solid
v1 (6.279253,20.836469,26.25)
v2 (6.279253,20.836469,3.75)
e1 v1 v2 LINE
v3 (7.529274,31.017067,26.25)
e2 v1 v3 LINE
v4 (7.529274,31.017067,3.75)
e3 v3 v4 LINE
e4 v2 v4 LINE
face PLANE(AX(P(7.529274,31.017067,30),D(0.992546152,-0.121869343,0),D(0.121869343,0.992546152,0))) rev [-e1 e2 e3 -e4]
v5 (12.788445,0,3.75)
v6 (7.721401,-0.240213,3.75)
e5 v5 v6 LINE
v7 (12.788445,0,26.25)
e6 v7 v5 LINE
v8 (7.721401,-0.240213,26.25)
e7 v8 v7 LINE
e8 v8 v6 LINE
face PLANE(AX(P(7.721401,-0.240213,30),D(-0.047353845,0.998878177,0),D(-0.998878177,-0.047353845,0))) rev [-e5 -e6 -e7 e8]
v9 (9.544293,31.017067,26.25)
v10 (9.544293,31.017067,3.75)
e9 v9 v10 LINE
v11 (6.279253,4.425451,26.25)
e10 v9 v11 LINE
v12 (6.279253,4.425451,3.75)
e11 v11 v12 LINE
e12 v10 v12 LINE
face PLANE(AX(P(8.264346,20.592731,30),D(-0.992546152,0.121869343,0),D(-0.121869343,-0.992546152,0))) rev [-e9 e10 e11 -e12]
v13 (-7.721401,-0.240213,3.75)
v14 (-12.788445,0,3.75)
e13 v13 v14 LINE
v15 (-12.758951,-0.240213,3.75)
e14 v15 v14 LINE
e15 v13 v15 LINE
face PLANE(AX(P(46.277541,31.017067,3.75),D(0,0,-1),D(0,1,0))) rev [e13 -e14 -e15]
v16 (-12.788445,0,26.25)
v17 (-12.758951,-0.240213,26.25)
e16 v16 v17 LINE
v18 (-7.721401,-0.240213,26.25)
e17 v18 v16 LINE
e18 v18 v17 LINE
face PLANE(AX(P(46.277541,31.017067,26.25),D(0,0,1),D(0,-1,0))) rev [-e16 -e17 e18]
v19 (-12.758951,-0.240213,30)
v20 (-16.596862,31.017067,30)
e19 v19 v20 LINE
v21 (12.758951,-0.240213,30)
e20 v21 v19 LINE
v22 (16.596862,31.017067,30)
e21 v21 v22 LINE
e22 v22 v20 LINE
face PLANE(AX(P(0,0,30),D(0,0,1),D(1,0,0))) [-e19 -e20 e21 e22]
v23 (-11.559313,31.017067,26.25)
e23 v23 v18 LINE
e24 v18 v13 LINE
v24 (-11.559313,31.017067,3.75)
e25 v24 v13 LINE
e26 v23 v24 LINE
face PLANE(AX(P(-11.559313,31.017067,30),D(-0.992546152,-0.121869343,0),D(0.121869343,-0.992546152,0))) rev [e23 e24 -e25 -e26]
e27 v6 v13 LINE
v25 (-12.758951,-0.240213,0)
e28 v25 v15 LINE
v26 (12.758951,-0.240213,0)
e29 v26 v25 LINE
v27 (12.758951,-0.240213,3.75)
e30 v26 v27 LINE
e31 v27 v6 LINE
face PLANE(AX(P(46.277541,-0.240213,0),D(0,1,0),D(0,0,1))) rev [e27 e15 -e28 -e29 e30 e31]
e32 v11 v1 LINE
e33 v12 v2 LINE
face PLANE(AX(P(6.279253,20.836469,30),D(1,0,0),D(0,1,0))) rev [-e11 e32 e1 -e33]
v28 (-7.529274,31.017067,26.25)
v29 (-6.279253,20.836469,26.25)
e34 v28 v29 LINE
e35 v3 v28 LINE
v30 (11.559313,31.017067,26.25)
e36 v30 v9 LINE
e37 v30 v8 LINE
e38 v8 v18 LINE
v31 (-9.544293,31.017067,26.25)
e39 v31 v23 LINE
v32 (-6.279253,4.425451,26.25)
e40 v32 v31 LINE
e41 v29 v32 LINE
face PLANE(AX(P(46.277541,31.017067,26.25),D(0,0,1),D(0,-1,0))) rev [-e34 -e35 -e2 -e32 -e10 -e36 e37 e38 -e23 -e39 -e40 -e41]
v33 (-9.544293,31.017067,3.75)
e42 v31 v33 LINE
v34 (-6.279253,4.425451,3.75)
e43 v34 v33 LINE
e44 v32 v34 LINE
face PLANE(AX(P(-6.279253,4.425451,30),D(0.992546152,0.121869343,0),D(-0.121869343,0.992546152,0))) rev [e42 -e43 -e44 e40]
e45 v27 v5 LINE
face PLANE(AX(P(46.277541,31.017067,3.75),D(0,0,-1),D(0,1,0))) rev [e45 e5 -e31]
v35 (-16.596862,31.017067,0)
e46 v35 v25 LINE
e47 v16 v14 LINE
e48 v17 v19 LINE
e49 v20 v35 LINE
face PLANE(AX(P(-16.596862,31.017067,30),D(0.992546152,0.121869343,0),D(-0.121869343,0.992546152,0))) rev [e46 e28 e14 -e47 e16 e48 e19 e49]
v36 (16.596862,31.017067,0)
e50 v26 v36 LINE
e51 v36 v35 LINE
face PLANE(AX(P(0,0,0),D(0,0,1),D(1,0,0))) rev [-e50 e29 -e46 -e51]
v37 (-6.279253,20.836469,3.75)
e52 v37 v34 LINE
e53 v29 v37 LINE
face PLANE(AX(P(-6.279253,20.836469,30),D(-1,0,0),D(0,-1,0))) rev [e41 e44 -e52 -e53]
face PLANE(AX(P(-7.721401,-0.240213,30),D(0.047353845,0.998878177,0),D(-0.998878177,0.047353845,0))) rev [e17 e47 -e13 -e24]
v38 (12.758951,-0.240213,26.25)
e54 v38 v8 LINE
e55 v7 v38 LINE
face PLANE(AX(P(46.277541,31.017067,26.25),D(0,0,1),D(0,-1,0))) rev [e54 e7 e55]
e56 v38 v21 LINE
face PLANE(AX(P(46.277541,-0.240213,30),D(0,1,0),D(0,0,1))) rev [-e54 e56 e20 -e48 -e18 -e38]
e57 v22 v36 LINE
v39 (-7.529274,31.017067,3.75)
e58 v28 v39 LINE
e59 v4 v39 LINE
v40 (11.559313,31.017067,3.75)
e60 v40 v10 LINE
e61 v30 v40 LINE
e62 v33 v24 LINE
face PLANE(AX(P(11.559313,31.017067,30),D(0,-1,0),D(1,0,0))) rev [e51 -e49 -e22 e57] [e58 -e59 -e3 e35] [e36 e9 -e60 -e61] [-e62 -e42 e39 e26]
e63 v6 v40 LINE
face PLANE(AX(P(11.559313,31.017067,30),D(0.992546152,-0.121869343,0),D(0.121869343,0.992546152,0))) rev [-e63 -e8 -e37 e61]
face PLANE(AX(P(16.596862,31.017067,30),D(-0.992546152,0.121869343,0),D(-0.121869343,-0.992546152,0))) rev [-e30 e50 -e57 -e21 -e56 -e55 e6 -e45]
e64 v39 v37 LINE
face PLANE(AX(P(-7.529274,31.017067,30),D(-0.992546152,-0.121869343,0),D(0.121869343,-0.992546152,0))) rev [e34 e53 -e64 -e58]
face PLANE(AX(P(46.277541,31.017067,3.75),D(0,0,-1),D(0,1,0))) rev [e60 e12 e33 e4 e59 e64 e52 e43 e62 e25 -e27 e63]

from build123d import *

# Parameters (mm, degrees)
SALIENTE_EXTRUIR1_DEPTH             = 30
SALIENTE_EXTRUIR1_2_DEPTH           = 30
SALIENTE_EXTRUIR1_3_DEPTH           = 30
SALIENTE_EXTRUIR1_4_DEPTH           = 30
SALIENTE_EXTRUIR3_REACH             = 48.233
CROQUIS3_W                          = 3.75
CROQUIS3_H                          = 31.257280714
SALIENTE_EXTRUIR3_DIRECTION_2_REACH = 48.233


with BuildPart() as part:
    # Croquis1 → Saliente-Extruir1 (new body)
    with BuildSketch(Plane.XY):
        Polygon((11.559312896, 31.017067239), (16.596862024, 31.017067239), (12.788445042, 0), (7.721401409, -0.240213475), align=None)
    extrude(amount=SALIENTE_EXTRUIR1_DEPTH)



with BuildPart() as body_2:
    # Croquis1 → Saliente-Extruir1 2 (new body)
    with BuildSketch(Plane.XY):
        Polygon((-7.529273594, 31.017067239), (-6.279253351, 20.836469336), (-6.279253351, 4.425451239), (-8.264345654, 20.592730649), (-9.544293245, 31.017067239), align=None)
    extrude(amount=SALIENTE_EXTRUIR1_2_DEPTH)


with BuildPart() as body_3:
    # Croquis1 → Saliente-Extruir1 3 (new body)
    with BuildSketch(Plane.XY):
        Polygon((-11.559312896, 31.017067239), (-7.721401409, -0.240213475), (-12.788445042, 0), (-16.596862024, 31.017067239), align=None)
    extrude(amount=SALIENTE_EXTRUIR1_3_DEPTH)


with BuildPart() as body_4:
    # Croquis1 → Saliente-Extruir1 4 (new body)
    with BuildSketch(Plane.XY):
        Polygon((7.529273594, 31.017067239), (6.279253351, 20.836469336), (6.279253351, 4.425451239), (8.264345654, 20.592730649), (9.544293245, 31.017067239), align=None)
    extrude(amount=SALIENTE_EXTRUIR1_4_DEPTH)


with BuildPart() as part_1:
    add(part.part)

    add(body_2.part)  # Saliente-Extruir3 merges body 2

    add(body_4.part)  # Saliente-Extruir3 merges body 4

    add(body_3.part)  # Saliente-Extruir3 merges body 3
    # Saliente-Extruir3: up to this plane
    saliente_extruir3_end = Plane(origin=(16.596862024, 31.017067239, 30), z_dir=(-0.992546151641322, 0.12186934340514874, 0))
    # Croquis3 → Saliente-Extruir3 (add, up to the surface)
    with BuildSketch(Plane(origin=(0, 0, 0), x_dir=(0, 0, -1), z_dir=(1, 0, 0)), mode=Mode.PRIVATE) as saliente_extruir3_sk1:
        with Locations((-28.125, 15.388426882)):
            Rectangle(CROQUIS3_W, CROQUIS3_H)
    saliente_extruir3_tool1 = split(extrude(saliente_extruir3_sk1.sketch, amount=SALIENTE_EXTRUIR3_REACH, mode=Mode.PRIVATE), bisect_by=saliente_extruir3_end, keep=Keep.BOTH, mode=Mode.PRIVATE)
    add(saliente_extruir3_tool1.solids().sort_by_distance((0, 15.388427, 28.125))[0])
    # Croquis3 → Saliente-Extruir3 (add, up to the surface)
    with BuildSketch(Plane(origin=(0, 0, 0), x_dir=(0, 0, -1), z_dir=(1, 0, 0)), mode=Mode.PRIVATE) as saliente_extruir3_sk2:
        with Locations((-1.875, 15.388426882)):
            Rectangle(CROQUIS3_W, CROQUIS3_H)
    saliente_extruir3_tool2 = split(extrude(saliente_extruir3_sk2.sketch, amount=SALIENTE_EXTRUIR3_REACH, mode=Mode.PRIVATE), bisect_by=saliente_extruir3_end, keep=Keep.BOTH, mode=Mode.PRIVATE)
    add(saliente_extruir3_tool2.solids().sort_by_distance((0, 15.388427, 1.875))[0])

    # Saliente-Extruir3 direction 2: up to this plane
    saliente_extruir3_direction_2_end = Plane(origin=(-16.596862024, 31.017067239, 30), z_dir=(0.992546151641322, 0.12186934340514874, 0))
    # Croquis3 → Saliente-Extruir3 direction 2 (add, up to the surface)
    with BuildSketch(Plane(origin=(0, 0, 0), x_dir=(0, 0, -1), z_dir=(1, 0, 0)), mode=Mode.PRIVATE) as saliente_extruir3_direction_2_sk1:
        with Locations((-28.125, 15.388426882)):
            Rectangle(CROQUIS3_W, CROQUIS3_H)
    saliente_extruir3_direction_2_tool1 = split(extrude(saliente_extruir3_direction_2_sk1.sketch, amount=-SALIENTE_EXTRUIR3_DIRECTION_2_REACH, mode=Mode.PRIVATE), bisect_by=saliente_extruir3_direction_2_end, keep=Keep.BOTH, mode=Mode.PRIVATE)
    add(saliente_extruir3_direction_2_tool1.solids().sort_by_distance((0, 15.388427, 28.125))[0])
    # Croquis3 → Saliente-Extruir3 direction 2 (add, up to the surface)
    with BuildSketch(Plane(origin=(0, 0, 0), x_dir=(0, 0, -1), z_dir=(1, 0, 0)), mode=Mode.PRIVATE) as saliente_extruir3_direction_2_sk2:
        with Locations((-1.875, 15.388426882)):
            Rectangle(CROQUIS3_W, CROQUIS3_H)
    saliente_extruir3_direction_2_tool2 = split(extrude(saliente_extruir3_direction_2_sk2.sketch, amount=-SALIENTE_EXTRUIR3_DIRECTION_2_REACH, mode=Mode.PRIVATE), bisect_by=saliente_extruir3_direction_2_end, keep=Keep.BOTH, mode=Mode.PRIVATE)
    add(saliente_extruir3_direction_2_tool2.solids().sort_by_distance((0, 15.388427, 1.875))[0])


solid = part_1.part
